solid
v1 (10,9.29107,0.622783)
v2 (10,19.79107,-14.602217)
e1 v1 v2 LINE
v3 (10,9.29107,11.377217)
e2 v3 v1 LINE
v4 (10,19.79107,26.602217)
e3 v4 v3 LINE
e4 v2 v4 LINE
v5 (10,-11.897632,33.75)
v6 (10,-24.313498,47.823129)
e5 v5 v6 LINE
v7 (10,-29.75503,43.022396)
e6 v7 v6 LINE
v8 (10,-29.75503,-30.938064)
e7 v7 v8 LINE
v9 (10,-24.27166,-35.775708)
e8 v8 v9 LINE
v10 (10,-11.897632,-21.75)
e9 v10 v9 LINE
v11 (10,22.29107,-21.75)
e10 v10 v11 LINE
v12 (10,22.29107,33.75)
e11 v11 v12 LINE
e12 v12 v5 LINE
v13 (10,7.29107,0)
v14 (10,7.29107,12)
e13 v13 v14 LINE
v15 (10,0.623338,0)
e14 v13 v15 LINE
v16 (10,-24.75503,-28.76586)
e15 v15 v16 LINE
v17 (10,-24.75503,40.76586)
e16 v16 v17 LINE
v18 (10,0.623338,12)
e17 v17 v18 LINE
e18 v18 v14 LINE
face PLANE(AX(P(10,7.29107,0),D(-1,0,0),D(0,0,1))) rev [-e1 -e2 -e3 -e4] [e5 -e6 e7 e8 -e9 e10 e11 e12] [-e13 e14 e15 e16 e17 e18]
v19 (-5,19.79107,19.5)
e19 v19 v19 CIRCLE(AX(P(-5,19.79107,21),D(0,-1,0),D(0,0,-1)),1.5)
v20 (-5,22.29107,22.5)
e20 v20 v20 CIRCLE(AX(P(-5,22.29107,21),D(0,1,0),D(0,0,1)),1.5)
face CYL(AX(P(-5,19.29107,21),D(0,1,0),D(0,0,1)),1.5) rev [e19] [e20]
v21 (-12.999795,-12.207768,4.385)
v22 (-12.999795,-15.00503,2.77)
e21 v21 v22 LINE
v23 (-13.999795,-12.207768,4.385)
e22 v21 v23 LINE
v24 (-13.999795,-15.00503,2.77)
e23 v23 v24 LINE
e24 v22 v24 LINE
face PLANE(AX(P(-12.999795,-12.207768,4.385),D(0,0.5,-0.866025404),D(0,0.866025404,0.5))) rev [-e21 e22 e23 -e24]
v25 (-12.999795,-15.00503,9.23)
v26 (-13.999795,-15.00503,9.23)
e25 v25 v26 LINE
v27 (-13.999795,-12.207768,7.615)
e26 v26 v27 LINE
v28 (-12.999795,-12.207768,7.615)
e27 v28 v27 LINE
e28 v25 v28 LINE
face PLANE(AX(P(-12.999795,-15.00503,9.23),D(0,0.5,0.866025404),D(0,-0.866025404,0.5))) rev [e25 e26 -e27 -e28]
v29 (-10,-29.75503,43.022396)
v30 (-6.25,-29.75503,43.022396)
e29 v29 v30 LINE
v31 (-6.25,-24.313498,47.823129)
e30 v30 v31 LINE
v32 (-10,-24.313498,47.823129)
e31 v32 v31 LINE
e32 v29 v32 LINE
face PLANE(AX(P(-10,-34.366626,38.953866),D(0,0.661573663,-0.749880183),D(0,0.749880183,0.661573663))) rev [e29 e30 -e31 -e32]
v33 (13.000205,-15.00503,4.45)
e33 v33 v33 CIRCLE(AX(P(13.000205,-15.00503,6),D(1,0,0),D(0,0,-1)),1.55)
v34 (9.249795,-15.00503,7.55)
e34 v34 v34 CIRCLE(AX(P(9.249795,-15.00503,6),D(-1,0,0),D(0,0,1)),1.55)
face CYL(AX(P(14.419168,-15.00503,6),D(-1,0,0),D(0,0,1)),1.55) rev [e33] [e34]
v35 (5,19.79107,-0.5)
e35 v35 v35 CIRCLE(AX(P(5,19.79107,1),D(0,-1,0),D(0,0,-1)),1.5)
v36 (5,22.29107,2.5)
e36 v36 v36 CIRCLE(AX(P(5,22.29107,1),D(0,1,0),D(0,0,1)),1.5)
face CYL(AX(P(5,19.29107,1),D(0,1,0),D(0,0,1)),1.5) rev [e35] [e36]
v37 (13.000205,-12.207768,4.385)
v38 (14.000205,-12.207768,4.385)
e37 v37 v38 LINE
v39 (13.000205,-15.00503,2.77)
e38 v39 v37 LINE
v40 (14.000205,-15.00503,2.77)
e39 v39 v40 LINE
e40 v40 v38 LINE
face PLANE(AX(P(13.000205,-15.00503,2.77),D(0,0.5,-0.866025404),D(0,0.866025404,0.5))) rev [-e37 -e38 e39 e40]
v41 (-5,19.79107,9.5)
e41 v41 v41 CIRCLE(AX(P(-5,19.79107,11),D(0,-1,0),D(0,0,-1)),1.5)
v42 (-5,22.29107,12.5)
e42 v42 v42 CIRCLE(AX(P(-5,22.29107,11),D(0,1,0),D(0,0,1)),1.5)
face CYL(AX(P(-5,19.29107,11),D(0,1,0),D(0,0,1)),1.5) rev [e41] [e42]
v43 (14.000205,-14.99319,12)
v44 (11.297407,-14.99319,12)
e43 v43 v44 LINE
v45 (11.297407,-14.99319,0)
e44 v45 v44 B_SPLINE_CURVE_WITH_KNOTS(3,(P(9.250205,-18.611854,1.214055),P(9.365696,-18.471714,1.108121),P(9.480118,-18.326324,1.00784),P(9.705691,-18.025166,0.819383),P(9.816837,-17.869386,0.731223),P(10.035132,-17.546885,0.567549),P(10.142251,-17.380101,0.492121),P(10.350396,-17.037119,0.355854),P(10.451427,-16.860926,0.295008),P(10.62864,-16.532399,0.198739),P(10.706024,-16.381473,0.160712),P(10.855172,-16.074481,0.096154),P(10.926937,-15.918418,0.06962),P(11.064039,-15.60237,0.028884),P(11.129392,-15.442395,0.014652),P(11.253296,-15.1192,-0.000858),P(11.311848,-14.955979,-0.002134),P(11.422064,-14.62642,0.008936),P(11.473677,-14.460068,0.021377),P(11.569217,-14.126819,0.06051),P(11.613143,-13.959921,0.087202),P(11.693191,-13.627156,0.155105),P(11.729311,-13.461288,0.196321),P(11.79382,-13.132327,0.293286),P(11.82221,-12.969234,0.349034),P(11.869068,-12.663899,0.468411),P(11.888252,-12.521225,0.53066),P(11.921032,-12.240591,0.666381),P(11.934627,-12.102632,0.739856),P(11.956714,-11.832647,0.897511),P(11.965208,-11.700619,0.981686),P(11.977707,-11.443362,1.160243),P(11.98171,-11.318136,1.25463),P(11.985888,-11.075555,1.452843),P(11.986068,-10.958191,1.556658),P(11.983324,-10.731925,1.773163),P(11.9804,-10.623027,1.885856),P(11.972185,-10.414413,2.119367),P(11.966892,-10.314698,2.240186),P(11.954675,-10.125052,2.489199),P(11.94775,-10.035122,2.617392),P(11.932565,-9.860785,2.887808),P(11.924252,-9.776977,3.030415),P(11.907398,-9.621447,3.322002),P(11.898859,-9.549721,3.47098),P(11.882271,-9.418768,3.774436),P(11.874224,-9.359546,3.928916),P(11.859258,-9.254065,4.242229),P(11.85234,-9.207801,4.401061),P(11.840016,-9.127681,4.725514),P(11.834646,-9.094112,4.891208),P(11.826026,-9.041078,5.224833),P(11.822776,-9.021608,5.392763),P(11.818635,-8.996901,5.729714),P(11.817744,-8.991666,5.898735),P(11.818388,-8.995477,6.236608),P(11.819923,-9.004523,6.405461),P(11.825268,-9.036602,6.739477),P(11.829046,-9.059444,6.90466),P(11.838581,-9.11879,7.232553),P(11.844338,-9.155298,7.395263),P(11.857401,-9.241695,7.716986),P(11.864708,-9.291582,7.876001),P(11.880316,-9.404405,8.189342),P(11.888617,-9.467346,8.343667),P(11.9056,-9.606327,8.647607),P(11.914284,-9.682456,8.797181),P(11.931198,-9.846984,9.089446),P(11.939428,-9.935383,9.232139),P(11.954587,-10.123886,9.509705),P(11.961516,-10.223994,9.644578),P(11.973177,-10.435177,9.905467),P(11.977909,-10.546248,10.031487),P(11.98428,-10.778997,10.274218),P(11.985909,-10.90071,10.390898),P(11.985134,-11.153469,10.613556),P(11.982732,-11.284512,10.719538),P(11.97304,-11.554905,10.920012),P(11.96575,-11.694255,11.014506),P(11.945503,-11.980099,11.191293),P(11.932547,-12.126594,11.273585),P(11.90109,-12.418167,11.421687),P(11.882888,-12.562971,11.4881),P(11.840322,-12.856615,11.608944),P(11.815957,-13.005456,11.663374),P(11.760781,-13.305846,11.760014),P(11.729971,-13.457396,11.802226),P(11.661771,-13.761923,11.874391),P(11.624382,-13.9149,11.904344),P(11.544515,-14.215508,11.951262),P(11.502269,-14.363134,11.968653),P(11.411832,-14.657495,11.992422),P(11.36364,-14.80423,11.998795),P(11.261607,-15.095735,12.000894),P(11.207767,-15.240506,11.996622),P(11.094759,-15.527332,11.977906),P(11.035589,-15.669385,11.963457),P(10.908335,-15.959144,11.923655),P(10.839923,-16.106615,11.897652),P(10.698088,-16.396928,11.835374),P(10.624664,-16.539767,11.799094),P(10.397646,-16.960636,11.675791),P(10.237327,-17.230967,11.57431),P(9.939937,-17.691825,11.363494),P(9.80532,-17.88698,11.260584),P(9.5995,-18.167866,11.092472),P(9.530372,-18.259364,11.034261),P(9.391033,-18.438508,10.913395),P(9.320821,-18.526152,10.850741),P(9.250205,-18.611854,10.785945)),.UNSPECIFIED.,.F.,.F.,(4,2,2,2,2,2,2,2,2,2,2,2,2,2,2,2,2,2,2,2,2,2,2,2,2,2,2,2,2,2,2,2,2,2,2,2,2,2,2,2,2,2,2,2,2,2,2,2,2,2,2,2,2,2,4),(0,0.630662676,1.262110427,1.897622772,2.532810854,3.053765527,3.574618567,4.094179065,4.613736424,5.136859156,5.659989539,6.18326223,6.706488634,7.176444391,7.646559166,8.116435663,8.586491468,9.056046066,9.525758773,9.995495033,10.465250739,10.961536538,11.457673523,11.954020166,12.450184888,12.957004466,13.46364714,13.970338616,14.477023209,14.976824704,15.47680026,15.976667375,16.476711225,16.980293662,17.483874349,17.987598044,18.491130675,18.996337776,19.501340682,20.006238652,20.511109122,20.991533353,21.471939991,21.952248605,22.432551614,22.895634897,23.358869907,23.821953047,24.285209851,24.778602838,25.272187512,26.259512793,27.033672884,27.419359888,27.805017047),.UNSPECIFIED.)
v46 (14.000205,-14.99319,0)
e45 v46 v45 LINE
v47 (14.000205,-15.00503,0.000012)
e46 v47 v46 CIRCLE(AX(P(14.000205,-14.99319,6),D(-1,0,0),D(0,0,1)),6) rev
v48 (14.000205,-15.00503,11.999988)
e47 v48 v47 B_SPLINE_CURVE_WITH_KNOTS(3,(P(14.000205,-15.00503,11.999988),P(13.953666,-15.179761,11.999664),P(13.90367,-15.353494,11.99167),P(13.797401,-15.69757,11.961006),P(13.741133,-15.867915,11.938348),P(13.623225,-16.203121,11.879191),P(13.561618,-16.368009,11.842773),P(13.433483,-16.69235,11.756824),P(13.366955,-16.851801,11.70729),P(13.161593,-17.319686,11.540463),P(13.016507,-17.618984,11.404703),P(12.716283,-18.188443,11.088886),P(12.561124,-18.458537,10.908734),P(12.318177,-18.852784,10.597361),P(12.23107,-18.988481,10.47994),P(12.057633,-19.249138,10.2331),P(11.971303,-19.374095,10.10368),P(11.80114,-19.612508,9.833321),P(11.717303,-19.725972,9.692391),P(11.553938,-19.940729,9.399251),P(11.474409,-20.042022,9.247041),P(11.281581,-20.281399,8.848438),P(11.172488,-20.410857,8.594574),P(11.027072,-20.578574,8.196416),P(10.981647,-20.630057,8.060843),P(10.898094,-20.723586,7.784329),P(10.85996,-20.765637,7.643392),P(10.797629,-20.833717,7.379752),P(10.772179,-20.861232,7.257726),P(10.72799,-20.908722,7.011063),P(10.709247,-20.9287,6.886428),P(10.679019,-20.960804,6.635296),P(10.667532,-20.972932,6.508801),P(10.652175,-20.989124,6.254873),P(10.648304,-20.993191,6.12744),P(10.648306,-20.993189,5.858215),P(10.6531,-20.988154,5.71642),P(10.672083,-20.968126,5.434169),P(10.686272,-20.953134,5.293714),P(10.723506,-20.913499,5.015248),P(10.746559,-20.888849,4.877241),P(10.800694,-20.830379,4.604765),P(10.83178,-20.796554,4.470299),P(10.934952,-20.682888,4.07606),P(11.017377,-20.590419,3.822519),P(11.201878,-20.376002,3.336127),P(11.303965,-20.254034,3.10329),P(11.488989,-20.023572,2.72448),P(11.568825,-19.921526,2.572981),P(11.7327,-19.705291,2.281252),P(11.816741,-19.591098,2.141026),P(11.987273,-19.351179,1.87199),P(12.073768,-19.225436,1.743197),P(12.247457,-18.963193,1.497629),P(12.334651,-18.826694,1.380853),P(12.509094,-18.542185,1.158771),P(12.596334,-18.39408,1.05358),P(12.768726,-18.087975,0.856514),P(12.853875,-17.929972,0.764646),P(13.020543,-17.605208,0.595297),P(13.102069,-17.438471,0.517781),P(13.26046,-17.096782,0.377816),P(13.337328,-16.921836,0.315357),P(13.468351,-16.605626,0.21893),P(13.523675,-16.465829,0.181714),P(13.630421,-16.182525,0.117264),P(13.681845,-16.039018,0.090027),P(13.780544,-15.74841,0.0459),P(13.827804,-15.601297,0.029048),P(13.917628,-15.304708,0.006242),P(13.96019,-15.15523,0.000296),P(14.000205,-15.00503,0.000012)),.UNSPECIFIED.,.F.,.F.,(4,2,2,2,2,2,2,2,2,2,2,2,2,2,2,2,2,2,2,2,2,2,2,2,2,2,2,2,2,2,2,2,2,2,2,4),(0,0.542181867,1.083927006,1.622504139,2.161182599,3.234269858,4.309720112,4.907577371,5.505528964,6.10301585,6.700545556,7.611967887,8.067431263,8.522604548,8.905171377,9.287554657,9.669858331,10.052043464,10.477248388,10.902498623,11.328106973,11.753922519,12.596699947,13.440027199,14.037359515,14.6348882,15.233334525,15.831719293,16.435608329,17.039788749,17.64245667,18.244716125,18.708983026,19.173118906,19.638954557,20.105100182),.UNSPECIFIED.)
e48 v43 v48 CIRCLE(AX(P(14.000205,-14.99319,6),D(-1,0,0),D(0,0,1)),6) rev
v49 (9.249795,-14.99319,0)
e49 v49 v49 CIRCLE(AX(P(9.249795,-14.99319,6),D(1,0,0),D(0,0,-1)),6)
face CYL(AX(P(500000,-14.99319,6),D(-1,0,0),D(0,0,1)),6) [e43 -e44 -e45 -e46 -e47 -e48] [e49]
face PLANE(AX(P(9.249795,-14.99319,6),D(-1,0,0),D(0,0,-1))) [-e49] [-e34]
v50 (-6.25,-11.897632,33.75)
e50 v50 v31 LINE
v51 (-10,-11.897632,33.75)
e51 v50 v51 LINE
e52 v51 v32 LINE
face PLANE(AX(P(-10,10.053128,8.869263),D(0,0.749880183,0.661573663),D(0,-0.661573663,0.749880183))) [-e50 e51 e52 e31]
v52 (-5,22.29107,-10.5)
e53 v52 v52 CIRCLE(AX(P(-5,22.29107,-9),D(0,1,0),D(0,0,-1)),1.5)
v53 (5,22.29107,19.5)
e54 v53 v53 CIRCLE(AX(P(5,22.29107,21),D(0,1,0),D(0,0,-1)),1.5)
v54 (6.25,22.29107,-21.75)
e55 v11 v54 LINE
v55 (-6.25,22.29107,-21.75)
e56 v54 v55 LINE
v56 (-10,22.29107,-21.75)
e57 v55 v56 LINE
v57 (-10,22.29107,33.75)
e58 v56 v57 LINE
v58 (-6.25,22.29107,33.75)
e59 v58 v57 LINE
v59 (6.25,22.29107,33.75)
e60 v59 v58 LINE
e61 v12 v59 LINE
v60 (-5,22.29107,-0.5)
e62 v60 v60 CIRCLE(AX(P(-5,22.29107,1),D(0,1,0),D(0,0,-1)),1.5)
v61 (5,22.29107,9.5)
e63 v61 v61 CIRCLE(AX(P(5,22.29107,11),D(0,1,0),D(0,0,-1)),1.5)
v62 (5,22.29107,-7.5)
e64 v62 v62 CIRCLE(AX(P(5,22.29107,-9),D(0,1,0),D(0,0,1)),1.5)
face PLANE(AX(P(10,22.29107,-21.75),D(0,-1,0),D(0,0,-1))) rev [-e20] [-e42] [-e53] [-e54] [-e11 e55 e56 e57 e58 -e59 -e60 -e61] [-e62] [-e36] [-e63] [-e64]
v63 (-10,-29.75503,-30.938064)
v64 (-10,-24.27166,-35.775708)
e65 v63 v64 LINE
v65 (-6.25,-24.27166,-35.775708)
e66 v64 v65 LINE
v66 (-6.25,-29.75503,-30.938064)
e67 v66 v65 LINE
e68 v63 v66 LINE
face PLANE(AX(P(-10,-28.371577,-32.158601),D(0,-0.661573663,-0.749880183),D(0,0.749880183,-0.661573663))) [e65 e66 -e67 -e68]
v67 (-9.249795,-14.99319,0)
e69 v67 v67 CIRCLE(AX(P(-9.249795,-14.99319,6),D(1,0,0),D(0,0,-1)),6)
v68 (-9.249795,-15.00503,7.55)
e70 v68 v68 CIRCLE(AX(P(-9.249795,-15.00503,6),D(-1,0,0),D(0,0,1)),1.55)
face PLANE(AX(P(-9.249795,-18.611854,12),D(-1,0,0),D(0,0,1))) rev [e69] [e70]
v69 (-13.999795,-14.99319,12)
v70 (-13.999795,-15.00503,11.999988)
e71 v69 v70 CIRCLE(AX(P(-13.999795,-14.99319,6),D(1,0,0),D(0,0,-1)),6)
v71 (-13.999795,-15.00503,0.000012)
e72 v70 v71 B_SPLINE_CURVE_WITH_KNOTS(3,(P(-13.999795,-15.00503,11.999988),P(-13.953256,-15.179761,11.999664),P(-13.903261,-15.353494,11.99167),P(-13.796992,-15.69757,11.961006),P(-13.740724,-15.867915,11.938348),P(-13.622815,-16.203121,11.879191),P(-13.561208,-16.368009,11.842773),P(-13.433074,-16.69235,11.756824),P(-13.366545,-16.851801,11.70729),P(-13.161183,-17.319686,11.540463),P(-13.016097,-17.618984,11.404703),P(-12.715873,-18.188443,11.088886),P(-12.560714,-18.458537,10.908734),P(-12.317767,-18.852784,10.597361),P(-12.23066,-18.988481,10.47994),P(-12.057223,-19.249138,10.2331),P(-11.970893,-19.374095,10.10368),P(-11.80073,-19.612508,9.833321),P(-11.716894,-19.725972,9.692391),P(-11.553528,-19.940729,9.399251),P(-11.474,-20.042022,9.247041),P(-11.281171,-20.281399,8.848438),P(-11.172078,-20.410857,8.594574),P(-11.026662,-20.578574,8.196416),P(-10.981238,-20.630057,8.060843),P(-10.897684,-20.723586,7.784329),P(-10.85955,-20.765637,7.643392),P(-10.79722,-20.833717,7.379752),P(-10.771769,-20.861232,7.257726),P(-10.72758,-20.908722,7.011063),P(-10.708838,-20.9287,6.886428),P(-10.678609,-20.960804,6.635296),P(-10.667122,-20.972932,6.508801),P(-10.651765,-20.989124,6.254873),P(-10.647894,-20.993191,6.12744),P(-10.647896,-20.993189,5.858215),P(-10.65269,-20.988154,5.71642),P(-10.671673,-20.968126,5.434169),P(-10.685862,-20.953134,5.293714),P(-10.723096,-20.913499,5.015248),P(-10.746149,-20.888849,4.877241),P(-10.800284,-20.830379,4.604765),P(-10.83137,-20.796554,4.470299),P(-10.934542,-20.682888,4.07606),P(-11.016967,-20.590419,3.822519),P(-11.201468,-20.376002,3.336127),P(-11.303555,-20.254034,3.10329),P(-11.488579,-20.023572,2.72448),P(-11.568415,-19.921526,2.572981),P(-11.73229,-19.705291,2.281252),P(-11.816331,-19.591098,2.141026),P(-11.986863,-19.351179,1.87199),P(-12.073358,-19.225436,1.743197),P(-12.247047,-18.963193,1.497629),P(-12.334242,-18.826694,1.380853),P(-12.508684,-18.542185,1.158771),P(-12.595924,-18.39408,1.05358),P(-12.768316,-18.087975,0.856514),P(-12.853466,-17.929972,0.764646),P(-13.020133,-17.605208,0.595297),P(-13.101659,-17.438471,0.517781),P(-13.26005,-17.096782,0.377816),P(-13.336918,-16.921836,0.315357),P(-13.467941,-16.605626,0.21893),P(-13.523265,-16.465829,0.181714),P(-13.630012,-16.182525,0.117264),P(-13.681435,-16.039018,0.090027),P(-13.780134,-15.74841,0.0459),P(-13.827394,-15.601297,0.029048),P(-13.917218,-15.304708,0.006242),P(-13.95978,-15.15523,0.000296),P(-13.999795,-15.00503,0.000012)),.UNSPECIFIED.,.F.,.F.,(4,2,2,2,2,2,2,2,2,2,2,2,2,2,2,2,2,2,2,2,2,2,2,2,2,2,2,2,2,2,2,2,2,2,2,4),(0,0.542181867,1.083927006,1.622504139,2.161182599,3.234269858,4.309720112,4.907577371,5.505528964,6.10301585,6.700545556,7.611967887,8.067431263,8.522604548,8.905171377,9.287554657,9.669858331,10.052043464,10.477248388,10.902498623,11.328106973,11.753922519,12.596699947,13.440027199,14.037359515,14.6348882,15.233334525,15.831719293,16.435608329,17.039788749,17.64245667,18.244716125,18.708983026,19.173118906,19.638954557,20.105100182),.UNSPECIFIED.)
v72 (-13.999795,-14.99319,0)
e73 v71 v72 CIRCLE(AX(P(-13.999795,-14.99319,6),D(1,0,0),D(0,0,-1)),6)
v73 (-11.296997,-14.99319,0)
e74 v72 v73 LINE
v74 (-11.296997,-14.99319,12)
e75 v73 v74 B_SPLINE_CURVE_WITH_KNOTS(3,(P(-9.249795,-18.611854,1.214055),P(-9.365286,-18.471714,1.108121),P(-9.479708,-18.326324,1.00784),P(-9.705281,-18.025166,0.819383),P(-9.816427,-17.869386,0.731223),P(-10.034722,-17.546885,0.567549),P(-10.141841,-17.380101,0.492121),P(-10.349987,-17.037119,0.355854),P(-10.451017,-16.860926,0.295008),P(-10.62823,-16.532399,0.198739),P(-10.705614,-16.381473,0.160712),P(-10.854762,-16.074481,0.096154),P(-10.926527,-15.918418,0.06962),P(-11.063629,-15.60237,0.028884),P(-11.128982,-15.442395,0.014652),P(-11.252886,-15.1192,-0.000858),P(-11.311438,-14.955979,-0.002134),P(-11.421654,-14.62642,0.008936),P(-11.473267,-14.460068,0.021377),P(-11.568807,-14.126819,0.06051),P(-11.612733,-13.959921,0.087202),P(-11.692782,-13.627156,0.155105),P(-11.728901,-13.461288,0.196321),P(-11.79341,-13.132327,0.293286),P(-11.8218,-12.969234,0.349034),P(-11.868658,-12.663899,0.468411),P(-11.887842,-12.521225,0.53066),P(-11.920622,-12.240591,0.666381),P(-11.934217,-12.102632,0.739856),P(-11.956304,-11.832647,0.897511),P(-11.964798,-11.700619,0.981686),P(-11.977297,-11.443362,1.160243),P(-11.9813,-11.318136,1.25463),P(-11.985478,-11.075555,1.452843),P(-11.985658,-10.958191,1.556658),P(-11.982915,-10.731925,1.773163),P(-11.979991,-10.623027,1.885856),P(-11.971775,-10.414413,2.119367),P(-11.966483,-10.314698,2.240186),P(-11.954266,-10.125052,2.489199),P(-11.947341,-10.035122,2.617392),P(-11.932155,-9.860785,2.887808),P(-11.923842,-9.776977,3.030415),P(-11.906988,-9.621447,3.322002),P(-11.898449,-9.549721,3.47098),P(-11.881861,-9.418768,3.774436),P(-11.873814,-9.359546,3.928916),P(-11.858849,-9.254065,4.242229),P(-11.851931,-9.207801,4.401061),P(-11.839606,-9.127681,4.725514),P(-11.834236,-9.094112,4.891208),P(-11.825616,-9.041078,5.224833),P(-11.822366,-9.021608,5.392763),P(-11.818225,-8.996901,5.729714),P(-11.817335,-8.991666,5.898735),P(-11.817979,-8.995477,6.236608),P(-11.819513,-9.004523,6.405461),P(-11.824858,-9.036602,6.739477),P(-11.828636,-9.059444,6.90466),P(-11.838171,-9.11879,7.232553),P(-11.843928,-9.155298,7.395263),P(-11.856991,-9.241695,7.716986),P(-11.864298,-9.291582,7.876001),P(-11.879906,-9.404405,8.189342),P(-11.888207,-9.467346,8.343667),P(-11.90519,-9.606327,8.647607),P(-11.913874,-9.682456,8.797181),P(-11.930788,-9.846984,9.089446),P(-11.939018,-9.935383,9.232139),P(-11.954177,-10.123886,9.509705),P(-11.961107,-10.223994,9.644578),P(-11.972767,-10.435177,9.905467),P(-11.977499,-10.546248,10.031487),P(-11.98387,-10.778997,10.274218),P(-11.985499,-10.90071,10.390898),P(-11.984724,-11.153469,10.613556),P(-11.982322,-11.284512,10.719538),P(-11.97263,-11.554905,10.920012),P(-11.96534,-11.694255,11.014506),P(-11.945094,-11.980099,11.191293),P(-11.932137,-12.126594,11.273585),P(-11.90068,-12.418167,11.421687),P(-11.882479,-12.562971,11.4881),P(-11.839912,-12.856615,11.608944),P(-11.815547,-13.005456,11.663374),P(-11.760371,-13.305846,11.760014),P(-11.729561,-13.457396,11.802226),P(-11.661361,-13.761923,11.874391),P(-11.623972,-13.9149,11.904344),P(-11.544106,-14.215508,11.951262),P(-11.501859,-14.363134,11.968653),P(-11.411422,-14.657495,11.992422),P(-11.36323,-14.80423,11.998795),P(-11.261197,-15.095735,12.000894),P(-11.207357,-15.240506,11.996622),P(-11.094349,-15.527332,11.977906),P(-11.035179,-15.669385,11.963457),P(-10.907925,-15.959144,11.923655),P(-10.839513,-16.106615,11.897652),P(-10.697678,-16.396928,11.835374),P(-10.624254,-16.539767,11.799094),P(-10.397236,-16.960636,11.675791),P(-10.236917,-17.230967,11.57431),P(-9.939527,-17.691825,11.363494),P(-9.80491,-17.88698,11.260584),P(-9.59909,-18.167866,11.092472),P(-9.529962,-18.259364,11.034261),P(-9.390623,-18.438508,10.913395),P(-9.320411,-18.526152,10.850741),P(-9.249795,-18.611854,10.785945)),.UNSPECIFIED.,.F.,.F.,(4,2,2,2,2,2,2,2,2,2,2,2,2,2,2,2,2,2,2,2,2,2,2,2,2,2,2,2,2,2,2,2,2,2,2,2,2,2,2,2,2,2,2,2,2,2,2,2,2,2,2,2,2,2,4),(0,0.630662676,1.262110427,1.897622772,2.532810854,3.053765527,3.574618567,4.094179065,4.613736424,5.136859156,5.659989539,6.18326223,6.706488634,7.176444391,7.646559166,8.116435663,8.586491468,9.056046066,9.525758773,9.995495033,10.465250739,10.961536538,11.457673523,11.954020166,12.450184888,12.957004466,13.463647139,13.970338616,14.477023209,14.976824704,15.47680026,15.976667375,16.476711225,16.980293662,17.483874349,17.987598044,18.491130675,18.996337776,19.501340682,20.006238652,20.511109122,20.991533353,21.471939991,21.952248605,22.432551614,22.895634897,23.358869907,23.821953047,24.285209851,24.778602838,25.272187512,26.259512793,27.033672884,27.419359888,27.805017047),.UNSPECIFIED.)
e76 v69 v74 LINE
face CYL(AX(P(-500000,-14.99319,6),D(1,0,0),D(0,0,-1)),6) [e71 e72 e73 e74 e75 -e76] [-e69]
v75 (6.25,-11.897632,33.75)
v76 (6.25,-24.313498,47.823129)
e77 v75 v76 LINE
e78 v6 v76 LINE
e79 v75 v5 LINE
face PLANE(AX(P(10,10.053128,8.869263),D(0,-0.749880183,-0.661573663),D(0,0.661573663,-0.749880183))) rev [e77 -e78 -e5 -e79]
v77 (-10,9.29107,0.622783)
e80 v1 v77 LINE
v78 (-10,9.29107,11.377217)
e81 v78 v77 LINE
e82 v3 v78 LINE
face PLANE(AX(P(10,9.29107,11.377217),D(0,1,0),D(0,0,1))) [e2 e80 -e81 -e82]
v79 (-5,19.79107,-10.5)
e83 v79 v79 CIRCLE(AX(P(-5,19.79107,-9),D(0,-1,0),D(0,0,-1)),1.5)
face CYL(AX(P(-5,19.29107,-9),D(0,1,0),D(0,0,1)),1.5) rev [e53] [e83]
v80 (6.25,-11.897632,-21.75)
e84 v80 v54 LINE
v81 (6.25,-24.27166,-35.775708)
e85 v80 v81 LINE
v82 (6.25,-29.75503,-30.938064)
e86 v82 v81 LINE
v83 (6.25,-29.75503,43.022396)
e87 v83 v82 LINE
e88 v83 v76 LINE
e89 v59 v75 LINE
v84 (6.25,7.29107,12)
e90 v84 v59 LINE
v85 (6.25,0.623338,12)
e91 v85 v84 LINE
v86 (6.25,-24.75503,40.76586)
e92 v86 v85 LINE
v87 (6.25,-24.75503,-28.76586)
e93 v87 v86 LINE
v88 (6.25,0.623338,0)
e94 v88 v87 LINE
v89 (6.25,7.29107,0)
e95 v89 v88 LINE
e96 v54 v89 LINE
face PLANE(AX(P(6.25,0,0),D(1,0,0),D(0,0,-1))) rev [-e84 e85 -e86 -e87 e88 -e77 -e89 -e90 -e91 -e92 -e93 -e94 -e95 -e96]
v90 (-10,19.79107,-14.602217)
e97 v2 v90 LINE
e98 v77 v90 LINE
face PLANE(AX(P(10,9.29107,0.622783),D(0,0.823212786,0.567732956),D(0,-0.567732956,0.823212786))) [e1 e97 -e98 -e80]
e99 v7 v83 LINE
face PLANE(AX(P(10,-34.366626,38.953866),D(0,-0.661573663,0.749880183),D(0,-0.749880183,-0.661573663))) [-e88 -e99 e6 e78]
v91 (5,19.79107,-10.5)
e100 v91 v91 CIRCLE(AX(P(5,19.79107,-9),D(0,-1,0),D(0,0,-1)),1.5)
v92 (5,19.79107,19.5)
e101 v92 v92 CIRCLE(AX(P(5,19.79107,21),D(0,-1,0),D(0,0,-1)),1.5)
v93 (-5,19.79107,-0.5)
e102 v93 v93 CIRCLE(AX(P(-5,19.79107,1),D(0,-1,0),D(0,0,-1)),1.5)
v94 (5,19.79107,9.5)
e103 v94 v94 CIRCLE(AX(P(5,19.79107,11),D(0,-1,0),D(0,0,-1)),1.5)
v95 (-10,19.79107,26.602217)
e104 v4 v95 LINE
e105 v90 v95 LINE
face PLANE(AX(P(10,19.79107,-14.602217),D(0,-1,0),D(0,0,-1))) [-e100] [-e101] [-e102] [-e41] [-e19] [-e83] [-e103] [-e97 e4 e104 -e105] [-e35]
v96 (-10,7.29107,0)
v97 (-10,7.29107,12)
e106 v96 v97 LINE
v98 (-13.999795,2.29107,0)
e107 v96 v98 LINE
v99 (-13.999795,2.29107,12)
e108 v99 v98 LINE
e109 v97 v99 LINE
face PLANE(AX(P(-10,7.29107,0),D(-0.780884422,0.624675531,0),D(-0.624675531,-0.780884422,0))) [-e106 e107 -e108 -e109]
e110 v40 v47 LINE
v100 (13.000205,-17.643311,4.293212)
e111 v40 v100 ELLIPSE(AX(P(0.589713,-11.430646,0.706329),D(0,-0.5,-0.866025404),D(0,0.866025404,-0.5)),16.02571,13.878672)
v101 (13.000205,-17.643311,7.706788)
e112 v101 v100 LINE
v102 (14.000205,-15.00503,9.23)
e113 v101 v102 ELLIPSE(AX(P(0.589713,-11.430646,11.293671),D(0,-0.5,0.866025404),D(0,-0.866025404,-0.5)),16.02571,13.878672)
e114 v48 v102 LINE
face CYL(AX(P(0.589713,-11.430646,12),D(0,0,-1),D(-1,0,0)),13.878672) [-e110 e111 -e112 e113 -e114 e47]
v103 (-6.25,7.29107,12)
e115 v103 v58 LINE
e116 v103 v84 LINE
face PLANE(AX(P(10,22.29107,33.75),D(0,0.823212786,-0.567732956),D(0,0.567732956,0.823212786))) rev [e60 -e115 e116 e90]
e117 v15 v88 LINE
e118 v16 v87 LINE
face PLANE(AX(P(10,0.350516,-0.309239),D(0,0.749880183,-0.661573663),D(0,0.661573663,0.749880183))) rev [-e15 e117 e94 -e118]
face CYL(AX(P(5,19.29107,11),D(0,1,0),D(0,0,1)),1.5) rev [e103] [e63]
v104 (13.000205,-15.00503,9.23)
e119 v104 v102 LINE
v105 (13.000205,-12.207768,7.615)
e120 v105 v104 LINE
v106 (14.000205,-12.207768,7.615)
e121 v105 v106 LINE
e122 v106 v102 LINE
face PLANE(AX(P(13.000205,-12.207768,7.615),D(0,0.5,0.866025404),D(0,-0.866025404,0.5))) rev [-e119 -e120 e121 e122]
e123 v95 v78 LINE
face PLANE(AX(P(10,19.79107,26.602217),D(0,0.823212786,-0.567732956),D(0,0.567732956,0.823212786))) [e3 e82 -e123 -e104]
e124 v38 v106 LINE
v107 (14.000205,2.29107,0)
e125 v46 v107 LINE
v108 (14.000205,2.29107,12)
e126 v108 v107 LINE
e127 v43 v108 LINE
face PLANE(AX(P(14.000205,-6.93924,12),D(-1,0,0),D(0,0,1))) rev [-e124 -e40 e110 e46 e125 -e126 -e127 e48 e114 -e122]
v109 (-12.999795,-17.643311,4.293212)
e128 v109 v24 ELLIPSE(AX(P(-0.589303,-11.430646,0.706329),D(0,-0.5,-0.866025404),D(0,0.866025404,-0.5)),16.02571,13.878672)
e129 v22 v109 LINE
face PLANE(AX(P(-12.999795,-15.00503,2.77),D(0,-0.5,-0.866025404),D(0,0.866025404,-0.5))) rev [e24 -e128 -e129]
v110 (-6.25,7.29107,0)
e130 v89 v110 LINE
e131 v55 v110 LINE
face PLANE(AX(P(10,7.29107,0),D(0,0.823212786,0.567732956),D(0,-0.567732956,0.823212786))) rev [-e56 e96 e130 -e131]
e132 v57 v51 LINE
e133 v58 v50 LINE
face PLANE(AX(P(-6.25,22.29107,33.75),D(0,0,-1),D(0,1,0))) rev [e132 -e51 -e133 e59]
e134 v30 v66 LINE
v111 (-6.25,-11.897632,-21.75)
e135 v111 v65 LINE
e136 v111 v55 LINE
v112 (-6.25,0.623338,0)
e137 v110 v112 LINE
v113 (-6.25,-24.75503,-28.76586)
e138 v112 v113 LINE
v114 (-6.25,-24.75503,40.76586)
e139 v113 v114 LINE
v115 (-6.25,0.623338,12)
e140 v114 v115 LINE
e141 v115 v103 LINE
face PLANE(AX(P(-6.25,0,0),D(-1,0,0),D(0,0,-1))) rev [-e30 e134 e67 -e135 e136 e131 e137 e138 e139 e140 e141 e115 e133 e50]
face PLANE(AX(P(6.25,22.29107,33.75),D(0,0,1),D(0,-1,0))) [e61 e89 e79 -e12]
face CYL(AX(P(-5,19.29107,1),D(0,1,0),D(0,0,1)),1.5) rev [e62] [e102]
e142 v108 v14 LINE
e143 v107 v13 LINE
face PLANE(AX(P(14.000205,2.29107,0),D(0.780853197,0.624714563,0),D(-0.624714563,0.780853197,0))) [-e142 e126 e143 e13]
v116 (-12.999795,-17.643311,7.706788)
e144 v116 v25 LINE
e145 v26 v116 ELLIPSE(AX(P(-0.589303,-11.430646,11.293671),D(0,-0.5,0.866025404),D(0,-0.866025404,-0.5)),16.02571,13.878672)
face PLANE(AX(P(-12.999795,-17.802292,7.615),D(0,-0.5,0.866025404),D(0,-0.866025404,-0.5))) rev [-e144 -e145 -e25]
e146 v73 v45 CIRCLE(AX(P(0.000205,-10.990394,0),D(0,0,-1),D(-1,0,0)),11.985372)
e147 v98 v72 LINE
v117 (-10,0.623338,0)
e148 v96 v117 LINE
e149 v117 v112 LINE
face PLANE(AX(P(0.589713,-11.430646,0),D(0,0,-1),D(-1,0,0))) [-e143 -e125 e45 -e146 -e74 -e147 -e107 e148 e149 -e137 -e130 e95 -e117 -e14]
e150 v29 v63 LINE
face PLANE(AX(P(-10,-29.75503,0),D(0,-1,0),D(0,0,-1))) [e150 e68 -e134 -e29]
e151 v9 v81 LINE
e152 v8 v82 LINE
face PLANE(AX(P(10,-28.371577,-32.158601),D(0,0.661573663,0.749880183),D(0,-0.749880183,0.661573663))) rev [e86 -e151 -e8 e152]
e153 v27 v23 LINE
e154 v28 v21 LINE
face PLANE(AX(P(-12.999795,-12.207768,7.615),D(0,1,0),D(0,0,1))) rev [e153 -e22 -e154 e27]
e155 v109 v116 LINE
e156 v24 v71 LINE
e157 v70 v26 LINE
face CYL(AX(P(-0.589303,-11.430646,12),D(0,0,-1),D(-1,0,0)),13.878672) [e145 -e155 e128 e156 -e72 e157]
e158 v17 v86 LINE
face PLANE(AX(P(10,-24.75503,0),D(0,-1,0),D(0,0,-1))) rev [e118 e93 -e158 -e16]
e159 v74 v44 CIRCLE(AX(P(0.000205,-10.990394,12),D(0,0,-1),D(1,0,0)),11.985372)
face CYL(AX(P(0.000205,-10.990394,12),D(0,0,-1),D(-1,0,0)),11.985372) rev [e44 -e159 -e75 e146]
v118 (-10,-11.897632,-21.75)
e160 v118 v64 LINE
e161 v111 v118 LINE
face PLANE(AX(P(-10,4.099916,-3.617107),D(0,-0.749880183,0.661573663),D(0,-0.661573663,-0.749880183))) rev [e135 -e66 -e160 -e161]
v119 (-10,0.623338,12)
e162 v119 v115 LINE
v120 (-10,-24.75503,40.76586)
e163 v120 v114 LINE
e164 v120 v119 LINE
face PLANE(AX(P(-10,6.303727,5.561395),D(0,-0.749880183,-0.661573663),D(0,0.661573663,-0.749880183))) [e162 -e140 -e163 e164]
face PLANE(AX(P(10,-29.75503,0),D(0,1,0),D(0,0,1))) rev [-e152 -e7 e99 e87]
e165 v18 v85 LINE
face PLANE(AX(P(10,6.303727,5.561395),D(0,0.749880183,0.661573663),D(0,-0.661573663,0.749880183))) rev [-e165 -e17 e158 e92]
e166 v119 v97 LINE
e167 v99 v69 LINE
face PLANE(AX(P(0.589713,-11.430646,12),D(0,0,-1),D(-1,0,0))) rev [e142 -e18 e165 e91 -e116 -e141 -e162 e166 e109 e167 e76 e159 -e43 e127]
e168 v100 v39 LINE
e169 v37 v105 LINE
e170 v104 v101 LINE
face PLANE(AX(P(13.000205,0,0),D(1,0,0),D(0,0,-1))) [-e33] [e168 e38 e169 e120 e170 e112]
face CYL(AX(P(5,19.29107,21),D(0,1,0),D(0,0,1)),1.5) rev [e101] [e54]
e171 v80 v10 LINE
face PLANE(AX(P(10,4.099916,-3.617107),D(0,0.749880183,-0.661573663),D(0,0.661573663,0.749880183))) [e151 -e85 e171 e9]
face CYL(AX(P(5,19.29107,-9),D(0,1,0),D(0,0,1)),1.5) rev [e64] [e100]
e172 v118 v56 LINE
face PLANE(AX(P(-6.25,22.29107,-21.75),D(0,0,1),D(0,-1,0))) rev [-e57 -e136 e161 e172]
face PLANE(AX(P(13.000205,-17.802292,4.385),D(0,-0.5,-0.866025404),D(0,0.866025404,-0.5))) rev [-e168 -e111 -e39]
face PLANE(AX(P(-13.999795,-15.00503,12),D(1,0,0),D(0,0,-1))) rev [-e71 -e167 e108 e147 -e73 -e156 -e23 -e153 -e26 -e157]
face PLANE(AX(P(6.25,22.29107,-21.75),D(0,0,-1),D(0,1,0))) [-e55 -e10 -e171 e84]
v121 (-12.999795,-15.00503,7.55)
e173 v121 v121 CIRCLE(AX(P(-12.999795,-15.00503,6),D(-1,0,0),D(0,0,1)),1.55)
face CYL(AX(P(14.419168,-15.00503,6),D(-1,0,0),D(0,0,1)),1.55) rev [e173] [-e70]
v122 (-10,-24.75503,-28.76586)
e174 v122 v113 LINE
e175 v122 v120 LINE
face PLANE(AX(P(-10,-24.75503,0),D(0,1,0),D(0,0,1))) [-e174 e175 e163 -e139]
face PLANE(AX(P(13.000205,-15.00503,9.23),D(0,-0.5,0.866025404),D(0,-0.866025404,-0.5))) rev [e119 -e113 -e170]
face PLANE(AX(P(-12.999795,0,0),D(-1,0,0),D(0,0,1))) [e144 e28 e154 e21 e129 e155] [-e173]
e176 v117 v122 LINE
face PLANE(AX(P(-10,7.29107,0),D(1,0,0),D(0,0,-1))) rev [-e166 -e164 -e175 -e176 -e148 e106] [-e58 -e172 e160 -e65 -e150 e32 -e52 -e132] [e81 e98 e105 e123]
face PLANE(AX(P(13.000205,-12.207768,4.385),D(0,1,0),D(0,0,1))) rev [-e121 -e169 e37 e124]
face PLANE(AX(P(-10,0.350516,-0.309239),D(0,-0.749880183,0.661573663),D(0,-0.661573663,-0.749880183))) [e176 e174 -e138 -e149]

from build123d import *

# Parameters (mm, degrees)
EXTRUDE_1_DEPTH      = 12
EXTRUDE_2_REACH      = 35.545
EXTRUDE_2_END_RADIUS = 11.985372339
SKETCH_2_R           = 6
MIRROR_START         = 9.249795062
MIRROR_1_DEPTH       = 2.735782315
MIRROR_1_2_DEPTH     = 0.000409876
CUT_EXTRUDE_1_DEPTH  = 34.545141776
CUT_EXTRUDE_2_DEPTH  = 1
CUT_EXTRUDE_3_DEPTH  = 1
MIRROR_START_2       = 9.250204938
MIRROR_3_DEPTH       = 5.749795062
SKETCH_6_R           = 1.55
CUT_EXTRUDE_4_DEPTH  = 37.245193425
SKETCH_12_W          = 20
SKETCH_12_H          = 12
EXTRUDE_4_DEPTH      = 5
EXTRUDE_5_DEPTH      = 10
EXTRUDE_6_DEPTH      = 12
EXTRUDE_7_DEPTH      = 3.75
EXTRUDE_8_DEPTH      = 3.75
SKETCH_21_R          = 1.5
CUT_EXTRUDE_5_DEPTH  = 3


with BuildPart() as part:
    # 스케치1 → 보스-돌출1 (new body)
    with BuildSketch(Plane.XY):
        with BuildLine():
            Line((14.000204938, 2.291069809), (-13.999795062, 2.291069809))
            Line((-13.999795062, 2.291069809), (-13.999795062, -6.939240191))
            Line((-13.999795062, -6.939240191), (-13.999795062, -15.005030191))
            ThreePointArc((-13.999795062, -15.005030191), (-12.699794, -18.209549332), (-10.647895062, -20.993190191))
            Line((-10.647895062, -20.993190191), (-9.249795062, -20.993190191))
            Line((-9.249795062, -20.993190191), (-9.249795062, -18.61185417))
            ThreePointArc((-9.249795062, -18.61185417), (-10.428409882, -16.897436148), (-11.292795062, -15.005030191))
            ThreePointArc((-11.292795062, -15.005030191), (0.000204938, 0.99497801), (11.293204938, -15.005030191))
            ThreePointArc((11.293204938, -15.005030191), (10.428819757, -16.897436148), (9.250204938, -18.61185417))
            Line((9.250204938, -18.61185417), (9.250204938, -20.993190191))
            Line((9.250204938, -20.993190191), (10.648304938, -20.993190191))
            ThreePointArc((10.648304938, -20.993190191), (12.700203875, -18.209549332), (14.000204938, -15.005030191))
            Line((14.000204938, -15.005030191), (14.000204938, -6.939240191))
            Line((14.000204938, -6.939240191), (14.000204938, 2.291069809))
        make_face()
    extrude(amount=EXTRUDE_1_DEPTH)

    # 보스-돌출2: up to this cylinder (the profile starts inside it)
    extrude_2_end = Plane(origin=(0.000204938, -10.990394329, 6), z_dir=(0, 0, -1)) * Cylinder(EXTRUDE_2_END_RADIUS, 96.060744678, mode=Mode.PRIVATE)
    # 스케치2 → 보스-돌출2 (add, up to the surface)
    with BuildSketch(Plane(origin=(-9.249795062, 0, 0), x_dir=(0, 0, -1), z_dir=(1, 0, 0)), mode=Mode.PRIVATE) as extrude_2_sk1:
        with Locations((-6, -14.993190191)):
            Circle(SKETCH_2_R)
    extrude_2_tool1 = extrude(extrude_2_sk1.sketch, amount=-EXTRUDE_2_REACH, mode=Mode.PRIVATE) & extrude_2_end
    add(extrude_2_tool1.solids().sort_by_distance((-9.249795, -14.99319, 6))[0])

    # 대칭 복사1: read off the stored shape, not the designer's step
    # 대칭 복사1 outline → 대칭 복사1 (add)
    with BuildSketch(Plane.YZ.offset(MIRROR_START)):
        with BuildLine():
            ThreePointArc((-18.61185417, 1.214054847), (-8.993190191, 6), (-18.61185417, 10.785945153))
            Line((-18.61185417, 10.785945153), (-18.61185417, 1.214054847))
        make_face()
    extrude(amount=MIRROR_1_DEPTH)

    # Mirror 1 2 outline → Mirror 1 2 (add)
    with BuildSketch(Plane.YZ.offset(MIRROR_START)):
        with BuildLine():
            Line((-18.61185417, 1.214054847), (-18.61185417, 10.785945153))
            ThreePointArc((-18.61185417, 10.785945153), (-20.993190191, 6), (-18.61185417, 1.214054847))
        make_face()
    extrude(amount=MIRROR_1_2_DEPTH)

    # 스케치3 → 컷-돌출1 (cut, through all)
    with BuildSketch(Plane(origin=(-9.249795062, 0, 0), x_dir=(0, 0, -1), z_dir=(1, 0, 0))):
        with BuildLine():
            Line((-6, -20.993190191), (0, -20.993190191))
            Line((0, -20.993190191), (0, -18.61185417))
            Line((0, -18.61185417), (-1.214054847, -18.61185417))
            ThreePointArc((-1.214054847, -18.61185417), (-3.327172272, -20.364967545), (-6, -20.993190191))
        make_face()
        with BuildLine():
            Line((-12, -20.993190191), (-6, -20.993190191))
            ThreePointArc((-6, -20.993190191), (-8.672827728, -20.364967545), (-10.785945153, -18.61185417))
            Line((-10.785945153, -18.61185417), (-12, -18.61185417))
            Line((-12, -18.61185417), (-12, -20.993190191))
        make_face()
        with BuildLine():
            Line((-12, -18.61185417), (-10.785945153, -18.61185417))
            ThreePointArc((-10.785945153, -18.61185417), (-11.688394805, -16.901635773), (-12, -14.993190191))
            Line((-12, -14.993190191), (-12, -18.61185417))
        make_face()
        with BuildLine():
            Line((-1.214054847, -18.61185417), (0, -18.61185417))
            Line((0, -18.61185417), (0, -14.993190191))
            ThreePointArc((0, -14.993190191), (-0.311605195, -16.901635773), (-1.214054847, -18.61185417))
        make_face()
    extrude(amount=-CUT_EXTRUDE_1_DEPTH, mode=Mode.SUBTRACT)

    # 스케치4 → 컷-돌출2 (cut)
    with BuildSketch(Plane.ZY.offset(13.999795062)):
        Polygon((9.23, -15.005030191), (7.615, -12.207768137), (4.385, -12.207768137), (2.77, -15.005030191), (4.385, -17.802292245), (7.615, -17.802292245), align=None)
    extrude(amount=-CUT_EXTRUDE_2_DEPTH, mode=Mode.SUBTRACT)

    # 스케치5 → 컷-돌출3 (cut)
    with BuildSketch(Plane(origin=(14.000204938, 0, 0), x_dir=(0, 0, -1), z_dir=(1, 0, 0))):
        Polygon((-2.77, -15.005030191), (-4.385, -12.207768137), (-7.615, -12.207768137), (-9.23, -15.005030191), (-7.615, -17.802292245), (-4.385, -17.802292245), align=None)
    extrude(amount=-CUT_EXTRUDE_3_DEPTH, mode=Mode.SUBTRACT)

    # 대칭 복사3: read off the stored shape, not the designer's step
    # 대칭 복사3 outline → 대칭 복사3 (cut)
    with BuildSketch(Plane.YZ.offset(MIRROR_START_2)):
        with BuildLine():
            ThreePointArc((-20.993190191, 6), (-19.235830878, 10.242640687), (-14.993190191, 12))
            Line((-14.993190191, 12), (-20.993190191, 12))
            Line((-20.993190191, 12), (-20.993190191, 6))
        make_face()
        with BuildLine():
            Line((-20.993190191, 0), (-14.993190191, 0))
            ThreePointArc((-14.993190191, 0), (-19.235830878, 1.757359313), (-20.993190191, 6))
            Line((-20.993190191, 6), (-20.993190191, 0))
        make_face()
    extrude(amount=MIRROR_3_DEPTH, mode=Mode.SUBTRACT)

    # 스케치6 → 컷-돌출4 (cut, through all)
    with BuildSketch(Plane.ZY.offset(12.999795062)):
        with Locations((6, -15.005030191)):
            Circle(SKETCH_6_R)
    extrude(amount=-CUT_EXTRUDE_4_DEPTH, mode=Mode.SUBTRACT)

    # 스케치12 → 보스-돌출4 (add)
    with BuildSketch(Plane(origin=(0, 2.291069809, 0), x_dir=(1, 0, 0), z_dir=(0, 1, 0))):
        with Locations((0, -6)):
            Rectangle(SKETCH_12_W, SKETCH_12_H)
    extrude(amount=EXTRUDE_4_DEPTH)

    # 스케치14 → 보스-돌출5 (add, symmetric)
    with BuildSketch(Plane(origin=(0, 0, 0), x_dir=(0, 0, -1), z_dir=(1, 0, 0))):
        Polygon((-12, 7.291069809), (0, 7.291069809), (21.75, 22.291069809), (-33.75, 22.291069809), align=None)
        Polygon((-11.377217009, 9.291069809), (-0.622782991, 9.291069809), (14.602217009, 19.791069809), (-26.602217009, 19.791069809), align=None, mode=Mode.SUBTRACT)
    extrude(amount=EXTRUDE_5_DEPTH, both=True)

    # 스케치15 → 보스-돌출6 (add)
    with BuildSketch(Plane.XY.offset(12)):
        Polygon((-10, 7.291069809), (-13.999795062, 2.291069809), (-10, 2.291069809), align=None)
        Polygon((10, 2.291069809), (14.000204938, 2.291069809), (10, 7.291069809), align=None)
    extrude(amount=-EXTRUDE_6_DEPTH)

    # 스케치19 → 보스-돌출7 (add)
    with BuildSketch(Plane(origin=(6.25, 0, 0), x_dir=(0, 0, -1), z_dir=(1, 0, 0))):
        Polygon((-12, 7.291069809), (-47.823129142, -24.313497594), (-43.022395989, -29.755030191), (30.938064105, -29.755030191), (35.775707613, -24.271660464), (0, 7.291069809), (0, 0.623337928), (28.765859914, -24.755030191), (-40.765859914, -24.755030191), (-12, 0.623337928), align=None)
    extrude_7 = extrude(amount=EXTRUDE_7_DEPTH)

    # 대칭 복사4: 보스-돌출7 across plane
    add(extrude_7.mirror(Plane(origin=(0, 0, 0), x_dir=(0, 0, 1), z_dir=(1, 0, 0))))

    # 스케치20 → 보스-돌출8 (add)
    with BuildSketch(Plane(origin=(10, 0, 0), x_dir=(0, 0, -1), z_dir=(1, 0, 0))):
        Polygon((-12, 7.291069809), (-33.75, 22.291069809), (-33.75, -11.897631945), align=None)
        Polygon((21.75, 22.291069809), (21.75, -11.897631945), (0, 7.291069809), align=None)
    extrude_8 = extrude(amount=-EXTRUDE_8_DEPTH)

    # 대칭 복사5: 보스-돌출8 across plane
    add(extrude_8.mirror(Plane(origin=(0, 0, 0), x_dir=(0, 0, 1), z_dir=(1, 0, 0))))

    # 스케치21 → 컷-돌출5 (cut)
    with BuildSketch(Plane(origin=(0, 22.291069809, 0), x_dir=(1, 0, 0), z_dir=(0, 1, 0))):
        with Locations(Location((5, 9, 0), (0, 0, 270))):
            Circle(SKETCH_21_R)
        with Locations(Location((5, -1, 0), (0, 0, 270))):
            Circle(SKETCH_21_R)
        with Locations(Location((-5, 9, 0), (0, 0, 90))):
            Circle(SKETCH_21_R)
        with Locations(Location((-5, -1, 0), (0, 0, 90))):
            Circle(SKETCH_21_R)
        with Locations(Location((5, -11, 0), (0, 0, 90))):
            Circle(SKETCH_21_R)
        with Locations(Location((5, -21, 0), (0, 0, 90))):
            Circle(SKETCH_21_R)
        with Locations(Location((-5, -21, 0), (0, 0, 270))):
            Circle(SKETCH_21_R)
        with Locations(Location((-5, -11, 0), (0, 0, 270))):
            Circle(SKETCH_21_R)
    extrude(amount=-CUT_EXTRUDE_5_DEPTH, mode=Mode.SUBTRACT)


solid = part.part
